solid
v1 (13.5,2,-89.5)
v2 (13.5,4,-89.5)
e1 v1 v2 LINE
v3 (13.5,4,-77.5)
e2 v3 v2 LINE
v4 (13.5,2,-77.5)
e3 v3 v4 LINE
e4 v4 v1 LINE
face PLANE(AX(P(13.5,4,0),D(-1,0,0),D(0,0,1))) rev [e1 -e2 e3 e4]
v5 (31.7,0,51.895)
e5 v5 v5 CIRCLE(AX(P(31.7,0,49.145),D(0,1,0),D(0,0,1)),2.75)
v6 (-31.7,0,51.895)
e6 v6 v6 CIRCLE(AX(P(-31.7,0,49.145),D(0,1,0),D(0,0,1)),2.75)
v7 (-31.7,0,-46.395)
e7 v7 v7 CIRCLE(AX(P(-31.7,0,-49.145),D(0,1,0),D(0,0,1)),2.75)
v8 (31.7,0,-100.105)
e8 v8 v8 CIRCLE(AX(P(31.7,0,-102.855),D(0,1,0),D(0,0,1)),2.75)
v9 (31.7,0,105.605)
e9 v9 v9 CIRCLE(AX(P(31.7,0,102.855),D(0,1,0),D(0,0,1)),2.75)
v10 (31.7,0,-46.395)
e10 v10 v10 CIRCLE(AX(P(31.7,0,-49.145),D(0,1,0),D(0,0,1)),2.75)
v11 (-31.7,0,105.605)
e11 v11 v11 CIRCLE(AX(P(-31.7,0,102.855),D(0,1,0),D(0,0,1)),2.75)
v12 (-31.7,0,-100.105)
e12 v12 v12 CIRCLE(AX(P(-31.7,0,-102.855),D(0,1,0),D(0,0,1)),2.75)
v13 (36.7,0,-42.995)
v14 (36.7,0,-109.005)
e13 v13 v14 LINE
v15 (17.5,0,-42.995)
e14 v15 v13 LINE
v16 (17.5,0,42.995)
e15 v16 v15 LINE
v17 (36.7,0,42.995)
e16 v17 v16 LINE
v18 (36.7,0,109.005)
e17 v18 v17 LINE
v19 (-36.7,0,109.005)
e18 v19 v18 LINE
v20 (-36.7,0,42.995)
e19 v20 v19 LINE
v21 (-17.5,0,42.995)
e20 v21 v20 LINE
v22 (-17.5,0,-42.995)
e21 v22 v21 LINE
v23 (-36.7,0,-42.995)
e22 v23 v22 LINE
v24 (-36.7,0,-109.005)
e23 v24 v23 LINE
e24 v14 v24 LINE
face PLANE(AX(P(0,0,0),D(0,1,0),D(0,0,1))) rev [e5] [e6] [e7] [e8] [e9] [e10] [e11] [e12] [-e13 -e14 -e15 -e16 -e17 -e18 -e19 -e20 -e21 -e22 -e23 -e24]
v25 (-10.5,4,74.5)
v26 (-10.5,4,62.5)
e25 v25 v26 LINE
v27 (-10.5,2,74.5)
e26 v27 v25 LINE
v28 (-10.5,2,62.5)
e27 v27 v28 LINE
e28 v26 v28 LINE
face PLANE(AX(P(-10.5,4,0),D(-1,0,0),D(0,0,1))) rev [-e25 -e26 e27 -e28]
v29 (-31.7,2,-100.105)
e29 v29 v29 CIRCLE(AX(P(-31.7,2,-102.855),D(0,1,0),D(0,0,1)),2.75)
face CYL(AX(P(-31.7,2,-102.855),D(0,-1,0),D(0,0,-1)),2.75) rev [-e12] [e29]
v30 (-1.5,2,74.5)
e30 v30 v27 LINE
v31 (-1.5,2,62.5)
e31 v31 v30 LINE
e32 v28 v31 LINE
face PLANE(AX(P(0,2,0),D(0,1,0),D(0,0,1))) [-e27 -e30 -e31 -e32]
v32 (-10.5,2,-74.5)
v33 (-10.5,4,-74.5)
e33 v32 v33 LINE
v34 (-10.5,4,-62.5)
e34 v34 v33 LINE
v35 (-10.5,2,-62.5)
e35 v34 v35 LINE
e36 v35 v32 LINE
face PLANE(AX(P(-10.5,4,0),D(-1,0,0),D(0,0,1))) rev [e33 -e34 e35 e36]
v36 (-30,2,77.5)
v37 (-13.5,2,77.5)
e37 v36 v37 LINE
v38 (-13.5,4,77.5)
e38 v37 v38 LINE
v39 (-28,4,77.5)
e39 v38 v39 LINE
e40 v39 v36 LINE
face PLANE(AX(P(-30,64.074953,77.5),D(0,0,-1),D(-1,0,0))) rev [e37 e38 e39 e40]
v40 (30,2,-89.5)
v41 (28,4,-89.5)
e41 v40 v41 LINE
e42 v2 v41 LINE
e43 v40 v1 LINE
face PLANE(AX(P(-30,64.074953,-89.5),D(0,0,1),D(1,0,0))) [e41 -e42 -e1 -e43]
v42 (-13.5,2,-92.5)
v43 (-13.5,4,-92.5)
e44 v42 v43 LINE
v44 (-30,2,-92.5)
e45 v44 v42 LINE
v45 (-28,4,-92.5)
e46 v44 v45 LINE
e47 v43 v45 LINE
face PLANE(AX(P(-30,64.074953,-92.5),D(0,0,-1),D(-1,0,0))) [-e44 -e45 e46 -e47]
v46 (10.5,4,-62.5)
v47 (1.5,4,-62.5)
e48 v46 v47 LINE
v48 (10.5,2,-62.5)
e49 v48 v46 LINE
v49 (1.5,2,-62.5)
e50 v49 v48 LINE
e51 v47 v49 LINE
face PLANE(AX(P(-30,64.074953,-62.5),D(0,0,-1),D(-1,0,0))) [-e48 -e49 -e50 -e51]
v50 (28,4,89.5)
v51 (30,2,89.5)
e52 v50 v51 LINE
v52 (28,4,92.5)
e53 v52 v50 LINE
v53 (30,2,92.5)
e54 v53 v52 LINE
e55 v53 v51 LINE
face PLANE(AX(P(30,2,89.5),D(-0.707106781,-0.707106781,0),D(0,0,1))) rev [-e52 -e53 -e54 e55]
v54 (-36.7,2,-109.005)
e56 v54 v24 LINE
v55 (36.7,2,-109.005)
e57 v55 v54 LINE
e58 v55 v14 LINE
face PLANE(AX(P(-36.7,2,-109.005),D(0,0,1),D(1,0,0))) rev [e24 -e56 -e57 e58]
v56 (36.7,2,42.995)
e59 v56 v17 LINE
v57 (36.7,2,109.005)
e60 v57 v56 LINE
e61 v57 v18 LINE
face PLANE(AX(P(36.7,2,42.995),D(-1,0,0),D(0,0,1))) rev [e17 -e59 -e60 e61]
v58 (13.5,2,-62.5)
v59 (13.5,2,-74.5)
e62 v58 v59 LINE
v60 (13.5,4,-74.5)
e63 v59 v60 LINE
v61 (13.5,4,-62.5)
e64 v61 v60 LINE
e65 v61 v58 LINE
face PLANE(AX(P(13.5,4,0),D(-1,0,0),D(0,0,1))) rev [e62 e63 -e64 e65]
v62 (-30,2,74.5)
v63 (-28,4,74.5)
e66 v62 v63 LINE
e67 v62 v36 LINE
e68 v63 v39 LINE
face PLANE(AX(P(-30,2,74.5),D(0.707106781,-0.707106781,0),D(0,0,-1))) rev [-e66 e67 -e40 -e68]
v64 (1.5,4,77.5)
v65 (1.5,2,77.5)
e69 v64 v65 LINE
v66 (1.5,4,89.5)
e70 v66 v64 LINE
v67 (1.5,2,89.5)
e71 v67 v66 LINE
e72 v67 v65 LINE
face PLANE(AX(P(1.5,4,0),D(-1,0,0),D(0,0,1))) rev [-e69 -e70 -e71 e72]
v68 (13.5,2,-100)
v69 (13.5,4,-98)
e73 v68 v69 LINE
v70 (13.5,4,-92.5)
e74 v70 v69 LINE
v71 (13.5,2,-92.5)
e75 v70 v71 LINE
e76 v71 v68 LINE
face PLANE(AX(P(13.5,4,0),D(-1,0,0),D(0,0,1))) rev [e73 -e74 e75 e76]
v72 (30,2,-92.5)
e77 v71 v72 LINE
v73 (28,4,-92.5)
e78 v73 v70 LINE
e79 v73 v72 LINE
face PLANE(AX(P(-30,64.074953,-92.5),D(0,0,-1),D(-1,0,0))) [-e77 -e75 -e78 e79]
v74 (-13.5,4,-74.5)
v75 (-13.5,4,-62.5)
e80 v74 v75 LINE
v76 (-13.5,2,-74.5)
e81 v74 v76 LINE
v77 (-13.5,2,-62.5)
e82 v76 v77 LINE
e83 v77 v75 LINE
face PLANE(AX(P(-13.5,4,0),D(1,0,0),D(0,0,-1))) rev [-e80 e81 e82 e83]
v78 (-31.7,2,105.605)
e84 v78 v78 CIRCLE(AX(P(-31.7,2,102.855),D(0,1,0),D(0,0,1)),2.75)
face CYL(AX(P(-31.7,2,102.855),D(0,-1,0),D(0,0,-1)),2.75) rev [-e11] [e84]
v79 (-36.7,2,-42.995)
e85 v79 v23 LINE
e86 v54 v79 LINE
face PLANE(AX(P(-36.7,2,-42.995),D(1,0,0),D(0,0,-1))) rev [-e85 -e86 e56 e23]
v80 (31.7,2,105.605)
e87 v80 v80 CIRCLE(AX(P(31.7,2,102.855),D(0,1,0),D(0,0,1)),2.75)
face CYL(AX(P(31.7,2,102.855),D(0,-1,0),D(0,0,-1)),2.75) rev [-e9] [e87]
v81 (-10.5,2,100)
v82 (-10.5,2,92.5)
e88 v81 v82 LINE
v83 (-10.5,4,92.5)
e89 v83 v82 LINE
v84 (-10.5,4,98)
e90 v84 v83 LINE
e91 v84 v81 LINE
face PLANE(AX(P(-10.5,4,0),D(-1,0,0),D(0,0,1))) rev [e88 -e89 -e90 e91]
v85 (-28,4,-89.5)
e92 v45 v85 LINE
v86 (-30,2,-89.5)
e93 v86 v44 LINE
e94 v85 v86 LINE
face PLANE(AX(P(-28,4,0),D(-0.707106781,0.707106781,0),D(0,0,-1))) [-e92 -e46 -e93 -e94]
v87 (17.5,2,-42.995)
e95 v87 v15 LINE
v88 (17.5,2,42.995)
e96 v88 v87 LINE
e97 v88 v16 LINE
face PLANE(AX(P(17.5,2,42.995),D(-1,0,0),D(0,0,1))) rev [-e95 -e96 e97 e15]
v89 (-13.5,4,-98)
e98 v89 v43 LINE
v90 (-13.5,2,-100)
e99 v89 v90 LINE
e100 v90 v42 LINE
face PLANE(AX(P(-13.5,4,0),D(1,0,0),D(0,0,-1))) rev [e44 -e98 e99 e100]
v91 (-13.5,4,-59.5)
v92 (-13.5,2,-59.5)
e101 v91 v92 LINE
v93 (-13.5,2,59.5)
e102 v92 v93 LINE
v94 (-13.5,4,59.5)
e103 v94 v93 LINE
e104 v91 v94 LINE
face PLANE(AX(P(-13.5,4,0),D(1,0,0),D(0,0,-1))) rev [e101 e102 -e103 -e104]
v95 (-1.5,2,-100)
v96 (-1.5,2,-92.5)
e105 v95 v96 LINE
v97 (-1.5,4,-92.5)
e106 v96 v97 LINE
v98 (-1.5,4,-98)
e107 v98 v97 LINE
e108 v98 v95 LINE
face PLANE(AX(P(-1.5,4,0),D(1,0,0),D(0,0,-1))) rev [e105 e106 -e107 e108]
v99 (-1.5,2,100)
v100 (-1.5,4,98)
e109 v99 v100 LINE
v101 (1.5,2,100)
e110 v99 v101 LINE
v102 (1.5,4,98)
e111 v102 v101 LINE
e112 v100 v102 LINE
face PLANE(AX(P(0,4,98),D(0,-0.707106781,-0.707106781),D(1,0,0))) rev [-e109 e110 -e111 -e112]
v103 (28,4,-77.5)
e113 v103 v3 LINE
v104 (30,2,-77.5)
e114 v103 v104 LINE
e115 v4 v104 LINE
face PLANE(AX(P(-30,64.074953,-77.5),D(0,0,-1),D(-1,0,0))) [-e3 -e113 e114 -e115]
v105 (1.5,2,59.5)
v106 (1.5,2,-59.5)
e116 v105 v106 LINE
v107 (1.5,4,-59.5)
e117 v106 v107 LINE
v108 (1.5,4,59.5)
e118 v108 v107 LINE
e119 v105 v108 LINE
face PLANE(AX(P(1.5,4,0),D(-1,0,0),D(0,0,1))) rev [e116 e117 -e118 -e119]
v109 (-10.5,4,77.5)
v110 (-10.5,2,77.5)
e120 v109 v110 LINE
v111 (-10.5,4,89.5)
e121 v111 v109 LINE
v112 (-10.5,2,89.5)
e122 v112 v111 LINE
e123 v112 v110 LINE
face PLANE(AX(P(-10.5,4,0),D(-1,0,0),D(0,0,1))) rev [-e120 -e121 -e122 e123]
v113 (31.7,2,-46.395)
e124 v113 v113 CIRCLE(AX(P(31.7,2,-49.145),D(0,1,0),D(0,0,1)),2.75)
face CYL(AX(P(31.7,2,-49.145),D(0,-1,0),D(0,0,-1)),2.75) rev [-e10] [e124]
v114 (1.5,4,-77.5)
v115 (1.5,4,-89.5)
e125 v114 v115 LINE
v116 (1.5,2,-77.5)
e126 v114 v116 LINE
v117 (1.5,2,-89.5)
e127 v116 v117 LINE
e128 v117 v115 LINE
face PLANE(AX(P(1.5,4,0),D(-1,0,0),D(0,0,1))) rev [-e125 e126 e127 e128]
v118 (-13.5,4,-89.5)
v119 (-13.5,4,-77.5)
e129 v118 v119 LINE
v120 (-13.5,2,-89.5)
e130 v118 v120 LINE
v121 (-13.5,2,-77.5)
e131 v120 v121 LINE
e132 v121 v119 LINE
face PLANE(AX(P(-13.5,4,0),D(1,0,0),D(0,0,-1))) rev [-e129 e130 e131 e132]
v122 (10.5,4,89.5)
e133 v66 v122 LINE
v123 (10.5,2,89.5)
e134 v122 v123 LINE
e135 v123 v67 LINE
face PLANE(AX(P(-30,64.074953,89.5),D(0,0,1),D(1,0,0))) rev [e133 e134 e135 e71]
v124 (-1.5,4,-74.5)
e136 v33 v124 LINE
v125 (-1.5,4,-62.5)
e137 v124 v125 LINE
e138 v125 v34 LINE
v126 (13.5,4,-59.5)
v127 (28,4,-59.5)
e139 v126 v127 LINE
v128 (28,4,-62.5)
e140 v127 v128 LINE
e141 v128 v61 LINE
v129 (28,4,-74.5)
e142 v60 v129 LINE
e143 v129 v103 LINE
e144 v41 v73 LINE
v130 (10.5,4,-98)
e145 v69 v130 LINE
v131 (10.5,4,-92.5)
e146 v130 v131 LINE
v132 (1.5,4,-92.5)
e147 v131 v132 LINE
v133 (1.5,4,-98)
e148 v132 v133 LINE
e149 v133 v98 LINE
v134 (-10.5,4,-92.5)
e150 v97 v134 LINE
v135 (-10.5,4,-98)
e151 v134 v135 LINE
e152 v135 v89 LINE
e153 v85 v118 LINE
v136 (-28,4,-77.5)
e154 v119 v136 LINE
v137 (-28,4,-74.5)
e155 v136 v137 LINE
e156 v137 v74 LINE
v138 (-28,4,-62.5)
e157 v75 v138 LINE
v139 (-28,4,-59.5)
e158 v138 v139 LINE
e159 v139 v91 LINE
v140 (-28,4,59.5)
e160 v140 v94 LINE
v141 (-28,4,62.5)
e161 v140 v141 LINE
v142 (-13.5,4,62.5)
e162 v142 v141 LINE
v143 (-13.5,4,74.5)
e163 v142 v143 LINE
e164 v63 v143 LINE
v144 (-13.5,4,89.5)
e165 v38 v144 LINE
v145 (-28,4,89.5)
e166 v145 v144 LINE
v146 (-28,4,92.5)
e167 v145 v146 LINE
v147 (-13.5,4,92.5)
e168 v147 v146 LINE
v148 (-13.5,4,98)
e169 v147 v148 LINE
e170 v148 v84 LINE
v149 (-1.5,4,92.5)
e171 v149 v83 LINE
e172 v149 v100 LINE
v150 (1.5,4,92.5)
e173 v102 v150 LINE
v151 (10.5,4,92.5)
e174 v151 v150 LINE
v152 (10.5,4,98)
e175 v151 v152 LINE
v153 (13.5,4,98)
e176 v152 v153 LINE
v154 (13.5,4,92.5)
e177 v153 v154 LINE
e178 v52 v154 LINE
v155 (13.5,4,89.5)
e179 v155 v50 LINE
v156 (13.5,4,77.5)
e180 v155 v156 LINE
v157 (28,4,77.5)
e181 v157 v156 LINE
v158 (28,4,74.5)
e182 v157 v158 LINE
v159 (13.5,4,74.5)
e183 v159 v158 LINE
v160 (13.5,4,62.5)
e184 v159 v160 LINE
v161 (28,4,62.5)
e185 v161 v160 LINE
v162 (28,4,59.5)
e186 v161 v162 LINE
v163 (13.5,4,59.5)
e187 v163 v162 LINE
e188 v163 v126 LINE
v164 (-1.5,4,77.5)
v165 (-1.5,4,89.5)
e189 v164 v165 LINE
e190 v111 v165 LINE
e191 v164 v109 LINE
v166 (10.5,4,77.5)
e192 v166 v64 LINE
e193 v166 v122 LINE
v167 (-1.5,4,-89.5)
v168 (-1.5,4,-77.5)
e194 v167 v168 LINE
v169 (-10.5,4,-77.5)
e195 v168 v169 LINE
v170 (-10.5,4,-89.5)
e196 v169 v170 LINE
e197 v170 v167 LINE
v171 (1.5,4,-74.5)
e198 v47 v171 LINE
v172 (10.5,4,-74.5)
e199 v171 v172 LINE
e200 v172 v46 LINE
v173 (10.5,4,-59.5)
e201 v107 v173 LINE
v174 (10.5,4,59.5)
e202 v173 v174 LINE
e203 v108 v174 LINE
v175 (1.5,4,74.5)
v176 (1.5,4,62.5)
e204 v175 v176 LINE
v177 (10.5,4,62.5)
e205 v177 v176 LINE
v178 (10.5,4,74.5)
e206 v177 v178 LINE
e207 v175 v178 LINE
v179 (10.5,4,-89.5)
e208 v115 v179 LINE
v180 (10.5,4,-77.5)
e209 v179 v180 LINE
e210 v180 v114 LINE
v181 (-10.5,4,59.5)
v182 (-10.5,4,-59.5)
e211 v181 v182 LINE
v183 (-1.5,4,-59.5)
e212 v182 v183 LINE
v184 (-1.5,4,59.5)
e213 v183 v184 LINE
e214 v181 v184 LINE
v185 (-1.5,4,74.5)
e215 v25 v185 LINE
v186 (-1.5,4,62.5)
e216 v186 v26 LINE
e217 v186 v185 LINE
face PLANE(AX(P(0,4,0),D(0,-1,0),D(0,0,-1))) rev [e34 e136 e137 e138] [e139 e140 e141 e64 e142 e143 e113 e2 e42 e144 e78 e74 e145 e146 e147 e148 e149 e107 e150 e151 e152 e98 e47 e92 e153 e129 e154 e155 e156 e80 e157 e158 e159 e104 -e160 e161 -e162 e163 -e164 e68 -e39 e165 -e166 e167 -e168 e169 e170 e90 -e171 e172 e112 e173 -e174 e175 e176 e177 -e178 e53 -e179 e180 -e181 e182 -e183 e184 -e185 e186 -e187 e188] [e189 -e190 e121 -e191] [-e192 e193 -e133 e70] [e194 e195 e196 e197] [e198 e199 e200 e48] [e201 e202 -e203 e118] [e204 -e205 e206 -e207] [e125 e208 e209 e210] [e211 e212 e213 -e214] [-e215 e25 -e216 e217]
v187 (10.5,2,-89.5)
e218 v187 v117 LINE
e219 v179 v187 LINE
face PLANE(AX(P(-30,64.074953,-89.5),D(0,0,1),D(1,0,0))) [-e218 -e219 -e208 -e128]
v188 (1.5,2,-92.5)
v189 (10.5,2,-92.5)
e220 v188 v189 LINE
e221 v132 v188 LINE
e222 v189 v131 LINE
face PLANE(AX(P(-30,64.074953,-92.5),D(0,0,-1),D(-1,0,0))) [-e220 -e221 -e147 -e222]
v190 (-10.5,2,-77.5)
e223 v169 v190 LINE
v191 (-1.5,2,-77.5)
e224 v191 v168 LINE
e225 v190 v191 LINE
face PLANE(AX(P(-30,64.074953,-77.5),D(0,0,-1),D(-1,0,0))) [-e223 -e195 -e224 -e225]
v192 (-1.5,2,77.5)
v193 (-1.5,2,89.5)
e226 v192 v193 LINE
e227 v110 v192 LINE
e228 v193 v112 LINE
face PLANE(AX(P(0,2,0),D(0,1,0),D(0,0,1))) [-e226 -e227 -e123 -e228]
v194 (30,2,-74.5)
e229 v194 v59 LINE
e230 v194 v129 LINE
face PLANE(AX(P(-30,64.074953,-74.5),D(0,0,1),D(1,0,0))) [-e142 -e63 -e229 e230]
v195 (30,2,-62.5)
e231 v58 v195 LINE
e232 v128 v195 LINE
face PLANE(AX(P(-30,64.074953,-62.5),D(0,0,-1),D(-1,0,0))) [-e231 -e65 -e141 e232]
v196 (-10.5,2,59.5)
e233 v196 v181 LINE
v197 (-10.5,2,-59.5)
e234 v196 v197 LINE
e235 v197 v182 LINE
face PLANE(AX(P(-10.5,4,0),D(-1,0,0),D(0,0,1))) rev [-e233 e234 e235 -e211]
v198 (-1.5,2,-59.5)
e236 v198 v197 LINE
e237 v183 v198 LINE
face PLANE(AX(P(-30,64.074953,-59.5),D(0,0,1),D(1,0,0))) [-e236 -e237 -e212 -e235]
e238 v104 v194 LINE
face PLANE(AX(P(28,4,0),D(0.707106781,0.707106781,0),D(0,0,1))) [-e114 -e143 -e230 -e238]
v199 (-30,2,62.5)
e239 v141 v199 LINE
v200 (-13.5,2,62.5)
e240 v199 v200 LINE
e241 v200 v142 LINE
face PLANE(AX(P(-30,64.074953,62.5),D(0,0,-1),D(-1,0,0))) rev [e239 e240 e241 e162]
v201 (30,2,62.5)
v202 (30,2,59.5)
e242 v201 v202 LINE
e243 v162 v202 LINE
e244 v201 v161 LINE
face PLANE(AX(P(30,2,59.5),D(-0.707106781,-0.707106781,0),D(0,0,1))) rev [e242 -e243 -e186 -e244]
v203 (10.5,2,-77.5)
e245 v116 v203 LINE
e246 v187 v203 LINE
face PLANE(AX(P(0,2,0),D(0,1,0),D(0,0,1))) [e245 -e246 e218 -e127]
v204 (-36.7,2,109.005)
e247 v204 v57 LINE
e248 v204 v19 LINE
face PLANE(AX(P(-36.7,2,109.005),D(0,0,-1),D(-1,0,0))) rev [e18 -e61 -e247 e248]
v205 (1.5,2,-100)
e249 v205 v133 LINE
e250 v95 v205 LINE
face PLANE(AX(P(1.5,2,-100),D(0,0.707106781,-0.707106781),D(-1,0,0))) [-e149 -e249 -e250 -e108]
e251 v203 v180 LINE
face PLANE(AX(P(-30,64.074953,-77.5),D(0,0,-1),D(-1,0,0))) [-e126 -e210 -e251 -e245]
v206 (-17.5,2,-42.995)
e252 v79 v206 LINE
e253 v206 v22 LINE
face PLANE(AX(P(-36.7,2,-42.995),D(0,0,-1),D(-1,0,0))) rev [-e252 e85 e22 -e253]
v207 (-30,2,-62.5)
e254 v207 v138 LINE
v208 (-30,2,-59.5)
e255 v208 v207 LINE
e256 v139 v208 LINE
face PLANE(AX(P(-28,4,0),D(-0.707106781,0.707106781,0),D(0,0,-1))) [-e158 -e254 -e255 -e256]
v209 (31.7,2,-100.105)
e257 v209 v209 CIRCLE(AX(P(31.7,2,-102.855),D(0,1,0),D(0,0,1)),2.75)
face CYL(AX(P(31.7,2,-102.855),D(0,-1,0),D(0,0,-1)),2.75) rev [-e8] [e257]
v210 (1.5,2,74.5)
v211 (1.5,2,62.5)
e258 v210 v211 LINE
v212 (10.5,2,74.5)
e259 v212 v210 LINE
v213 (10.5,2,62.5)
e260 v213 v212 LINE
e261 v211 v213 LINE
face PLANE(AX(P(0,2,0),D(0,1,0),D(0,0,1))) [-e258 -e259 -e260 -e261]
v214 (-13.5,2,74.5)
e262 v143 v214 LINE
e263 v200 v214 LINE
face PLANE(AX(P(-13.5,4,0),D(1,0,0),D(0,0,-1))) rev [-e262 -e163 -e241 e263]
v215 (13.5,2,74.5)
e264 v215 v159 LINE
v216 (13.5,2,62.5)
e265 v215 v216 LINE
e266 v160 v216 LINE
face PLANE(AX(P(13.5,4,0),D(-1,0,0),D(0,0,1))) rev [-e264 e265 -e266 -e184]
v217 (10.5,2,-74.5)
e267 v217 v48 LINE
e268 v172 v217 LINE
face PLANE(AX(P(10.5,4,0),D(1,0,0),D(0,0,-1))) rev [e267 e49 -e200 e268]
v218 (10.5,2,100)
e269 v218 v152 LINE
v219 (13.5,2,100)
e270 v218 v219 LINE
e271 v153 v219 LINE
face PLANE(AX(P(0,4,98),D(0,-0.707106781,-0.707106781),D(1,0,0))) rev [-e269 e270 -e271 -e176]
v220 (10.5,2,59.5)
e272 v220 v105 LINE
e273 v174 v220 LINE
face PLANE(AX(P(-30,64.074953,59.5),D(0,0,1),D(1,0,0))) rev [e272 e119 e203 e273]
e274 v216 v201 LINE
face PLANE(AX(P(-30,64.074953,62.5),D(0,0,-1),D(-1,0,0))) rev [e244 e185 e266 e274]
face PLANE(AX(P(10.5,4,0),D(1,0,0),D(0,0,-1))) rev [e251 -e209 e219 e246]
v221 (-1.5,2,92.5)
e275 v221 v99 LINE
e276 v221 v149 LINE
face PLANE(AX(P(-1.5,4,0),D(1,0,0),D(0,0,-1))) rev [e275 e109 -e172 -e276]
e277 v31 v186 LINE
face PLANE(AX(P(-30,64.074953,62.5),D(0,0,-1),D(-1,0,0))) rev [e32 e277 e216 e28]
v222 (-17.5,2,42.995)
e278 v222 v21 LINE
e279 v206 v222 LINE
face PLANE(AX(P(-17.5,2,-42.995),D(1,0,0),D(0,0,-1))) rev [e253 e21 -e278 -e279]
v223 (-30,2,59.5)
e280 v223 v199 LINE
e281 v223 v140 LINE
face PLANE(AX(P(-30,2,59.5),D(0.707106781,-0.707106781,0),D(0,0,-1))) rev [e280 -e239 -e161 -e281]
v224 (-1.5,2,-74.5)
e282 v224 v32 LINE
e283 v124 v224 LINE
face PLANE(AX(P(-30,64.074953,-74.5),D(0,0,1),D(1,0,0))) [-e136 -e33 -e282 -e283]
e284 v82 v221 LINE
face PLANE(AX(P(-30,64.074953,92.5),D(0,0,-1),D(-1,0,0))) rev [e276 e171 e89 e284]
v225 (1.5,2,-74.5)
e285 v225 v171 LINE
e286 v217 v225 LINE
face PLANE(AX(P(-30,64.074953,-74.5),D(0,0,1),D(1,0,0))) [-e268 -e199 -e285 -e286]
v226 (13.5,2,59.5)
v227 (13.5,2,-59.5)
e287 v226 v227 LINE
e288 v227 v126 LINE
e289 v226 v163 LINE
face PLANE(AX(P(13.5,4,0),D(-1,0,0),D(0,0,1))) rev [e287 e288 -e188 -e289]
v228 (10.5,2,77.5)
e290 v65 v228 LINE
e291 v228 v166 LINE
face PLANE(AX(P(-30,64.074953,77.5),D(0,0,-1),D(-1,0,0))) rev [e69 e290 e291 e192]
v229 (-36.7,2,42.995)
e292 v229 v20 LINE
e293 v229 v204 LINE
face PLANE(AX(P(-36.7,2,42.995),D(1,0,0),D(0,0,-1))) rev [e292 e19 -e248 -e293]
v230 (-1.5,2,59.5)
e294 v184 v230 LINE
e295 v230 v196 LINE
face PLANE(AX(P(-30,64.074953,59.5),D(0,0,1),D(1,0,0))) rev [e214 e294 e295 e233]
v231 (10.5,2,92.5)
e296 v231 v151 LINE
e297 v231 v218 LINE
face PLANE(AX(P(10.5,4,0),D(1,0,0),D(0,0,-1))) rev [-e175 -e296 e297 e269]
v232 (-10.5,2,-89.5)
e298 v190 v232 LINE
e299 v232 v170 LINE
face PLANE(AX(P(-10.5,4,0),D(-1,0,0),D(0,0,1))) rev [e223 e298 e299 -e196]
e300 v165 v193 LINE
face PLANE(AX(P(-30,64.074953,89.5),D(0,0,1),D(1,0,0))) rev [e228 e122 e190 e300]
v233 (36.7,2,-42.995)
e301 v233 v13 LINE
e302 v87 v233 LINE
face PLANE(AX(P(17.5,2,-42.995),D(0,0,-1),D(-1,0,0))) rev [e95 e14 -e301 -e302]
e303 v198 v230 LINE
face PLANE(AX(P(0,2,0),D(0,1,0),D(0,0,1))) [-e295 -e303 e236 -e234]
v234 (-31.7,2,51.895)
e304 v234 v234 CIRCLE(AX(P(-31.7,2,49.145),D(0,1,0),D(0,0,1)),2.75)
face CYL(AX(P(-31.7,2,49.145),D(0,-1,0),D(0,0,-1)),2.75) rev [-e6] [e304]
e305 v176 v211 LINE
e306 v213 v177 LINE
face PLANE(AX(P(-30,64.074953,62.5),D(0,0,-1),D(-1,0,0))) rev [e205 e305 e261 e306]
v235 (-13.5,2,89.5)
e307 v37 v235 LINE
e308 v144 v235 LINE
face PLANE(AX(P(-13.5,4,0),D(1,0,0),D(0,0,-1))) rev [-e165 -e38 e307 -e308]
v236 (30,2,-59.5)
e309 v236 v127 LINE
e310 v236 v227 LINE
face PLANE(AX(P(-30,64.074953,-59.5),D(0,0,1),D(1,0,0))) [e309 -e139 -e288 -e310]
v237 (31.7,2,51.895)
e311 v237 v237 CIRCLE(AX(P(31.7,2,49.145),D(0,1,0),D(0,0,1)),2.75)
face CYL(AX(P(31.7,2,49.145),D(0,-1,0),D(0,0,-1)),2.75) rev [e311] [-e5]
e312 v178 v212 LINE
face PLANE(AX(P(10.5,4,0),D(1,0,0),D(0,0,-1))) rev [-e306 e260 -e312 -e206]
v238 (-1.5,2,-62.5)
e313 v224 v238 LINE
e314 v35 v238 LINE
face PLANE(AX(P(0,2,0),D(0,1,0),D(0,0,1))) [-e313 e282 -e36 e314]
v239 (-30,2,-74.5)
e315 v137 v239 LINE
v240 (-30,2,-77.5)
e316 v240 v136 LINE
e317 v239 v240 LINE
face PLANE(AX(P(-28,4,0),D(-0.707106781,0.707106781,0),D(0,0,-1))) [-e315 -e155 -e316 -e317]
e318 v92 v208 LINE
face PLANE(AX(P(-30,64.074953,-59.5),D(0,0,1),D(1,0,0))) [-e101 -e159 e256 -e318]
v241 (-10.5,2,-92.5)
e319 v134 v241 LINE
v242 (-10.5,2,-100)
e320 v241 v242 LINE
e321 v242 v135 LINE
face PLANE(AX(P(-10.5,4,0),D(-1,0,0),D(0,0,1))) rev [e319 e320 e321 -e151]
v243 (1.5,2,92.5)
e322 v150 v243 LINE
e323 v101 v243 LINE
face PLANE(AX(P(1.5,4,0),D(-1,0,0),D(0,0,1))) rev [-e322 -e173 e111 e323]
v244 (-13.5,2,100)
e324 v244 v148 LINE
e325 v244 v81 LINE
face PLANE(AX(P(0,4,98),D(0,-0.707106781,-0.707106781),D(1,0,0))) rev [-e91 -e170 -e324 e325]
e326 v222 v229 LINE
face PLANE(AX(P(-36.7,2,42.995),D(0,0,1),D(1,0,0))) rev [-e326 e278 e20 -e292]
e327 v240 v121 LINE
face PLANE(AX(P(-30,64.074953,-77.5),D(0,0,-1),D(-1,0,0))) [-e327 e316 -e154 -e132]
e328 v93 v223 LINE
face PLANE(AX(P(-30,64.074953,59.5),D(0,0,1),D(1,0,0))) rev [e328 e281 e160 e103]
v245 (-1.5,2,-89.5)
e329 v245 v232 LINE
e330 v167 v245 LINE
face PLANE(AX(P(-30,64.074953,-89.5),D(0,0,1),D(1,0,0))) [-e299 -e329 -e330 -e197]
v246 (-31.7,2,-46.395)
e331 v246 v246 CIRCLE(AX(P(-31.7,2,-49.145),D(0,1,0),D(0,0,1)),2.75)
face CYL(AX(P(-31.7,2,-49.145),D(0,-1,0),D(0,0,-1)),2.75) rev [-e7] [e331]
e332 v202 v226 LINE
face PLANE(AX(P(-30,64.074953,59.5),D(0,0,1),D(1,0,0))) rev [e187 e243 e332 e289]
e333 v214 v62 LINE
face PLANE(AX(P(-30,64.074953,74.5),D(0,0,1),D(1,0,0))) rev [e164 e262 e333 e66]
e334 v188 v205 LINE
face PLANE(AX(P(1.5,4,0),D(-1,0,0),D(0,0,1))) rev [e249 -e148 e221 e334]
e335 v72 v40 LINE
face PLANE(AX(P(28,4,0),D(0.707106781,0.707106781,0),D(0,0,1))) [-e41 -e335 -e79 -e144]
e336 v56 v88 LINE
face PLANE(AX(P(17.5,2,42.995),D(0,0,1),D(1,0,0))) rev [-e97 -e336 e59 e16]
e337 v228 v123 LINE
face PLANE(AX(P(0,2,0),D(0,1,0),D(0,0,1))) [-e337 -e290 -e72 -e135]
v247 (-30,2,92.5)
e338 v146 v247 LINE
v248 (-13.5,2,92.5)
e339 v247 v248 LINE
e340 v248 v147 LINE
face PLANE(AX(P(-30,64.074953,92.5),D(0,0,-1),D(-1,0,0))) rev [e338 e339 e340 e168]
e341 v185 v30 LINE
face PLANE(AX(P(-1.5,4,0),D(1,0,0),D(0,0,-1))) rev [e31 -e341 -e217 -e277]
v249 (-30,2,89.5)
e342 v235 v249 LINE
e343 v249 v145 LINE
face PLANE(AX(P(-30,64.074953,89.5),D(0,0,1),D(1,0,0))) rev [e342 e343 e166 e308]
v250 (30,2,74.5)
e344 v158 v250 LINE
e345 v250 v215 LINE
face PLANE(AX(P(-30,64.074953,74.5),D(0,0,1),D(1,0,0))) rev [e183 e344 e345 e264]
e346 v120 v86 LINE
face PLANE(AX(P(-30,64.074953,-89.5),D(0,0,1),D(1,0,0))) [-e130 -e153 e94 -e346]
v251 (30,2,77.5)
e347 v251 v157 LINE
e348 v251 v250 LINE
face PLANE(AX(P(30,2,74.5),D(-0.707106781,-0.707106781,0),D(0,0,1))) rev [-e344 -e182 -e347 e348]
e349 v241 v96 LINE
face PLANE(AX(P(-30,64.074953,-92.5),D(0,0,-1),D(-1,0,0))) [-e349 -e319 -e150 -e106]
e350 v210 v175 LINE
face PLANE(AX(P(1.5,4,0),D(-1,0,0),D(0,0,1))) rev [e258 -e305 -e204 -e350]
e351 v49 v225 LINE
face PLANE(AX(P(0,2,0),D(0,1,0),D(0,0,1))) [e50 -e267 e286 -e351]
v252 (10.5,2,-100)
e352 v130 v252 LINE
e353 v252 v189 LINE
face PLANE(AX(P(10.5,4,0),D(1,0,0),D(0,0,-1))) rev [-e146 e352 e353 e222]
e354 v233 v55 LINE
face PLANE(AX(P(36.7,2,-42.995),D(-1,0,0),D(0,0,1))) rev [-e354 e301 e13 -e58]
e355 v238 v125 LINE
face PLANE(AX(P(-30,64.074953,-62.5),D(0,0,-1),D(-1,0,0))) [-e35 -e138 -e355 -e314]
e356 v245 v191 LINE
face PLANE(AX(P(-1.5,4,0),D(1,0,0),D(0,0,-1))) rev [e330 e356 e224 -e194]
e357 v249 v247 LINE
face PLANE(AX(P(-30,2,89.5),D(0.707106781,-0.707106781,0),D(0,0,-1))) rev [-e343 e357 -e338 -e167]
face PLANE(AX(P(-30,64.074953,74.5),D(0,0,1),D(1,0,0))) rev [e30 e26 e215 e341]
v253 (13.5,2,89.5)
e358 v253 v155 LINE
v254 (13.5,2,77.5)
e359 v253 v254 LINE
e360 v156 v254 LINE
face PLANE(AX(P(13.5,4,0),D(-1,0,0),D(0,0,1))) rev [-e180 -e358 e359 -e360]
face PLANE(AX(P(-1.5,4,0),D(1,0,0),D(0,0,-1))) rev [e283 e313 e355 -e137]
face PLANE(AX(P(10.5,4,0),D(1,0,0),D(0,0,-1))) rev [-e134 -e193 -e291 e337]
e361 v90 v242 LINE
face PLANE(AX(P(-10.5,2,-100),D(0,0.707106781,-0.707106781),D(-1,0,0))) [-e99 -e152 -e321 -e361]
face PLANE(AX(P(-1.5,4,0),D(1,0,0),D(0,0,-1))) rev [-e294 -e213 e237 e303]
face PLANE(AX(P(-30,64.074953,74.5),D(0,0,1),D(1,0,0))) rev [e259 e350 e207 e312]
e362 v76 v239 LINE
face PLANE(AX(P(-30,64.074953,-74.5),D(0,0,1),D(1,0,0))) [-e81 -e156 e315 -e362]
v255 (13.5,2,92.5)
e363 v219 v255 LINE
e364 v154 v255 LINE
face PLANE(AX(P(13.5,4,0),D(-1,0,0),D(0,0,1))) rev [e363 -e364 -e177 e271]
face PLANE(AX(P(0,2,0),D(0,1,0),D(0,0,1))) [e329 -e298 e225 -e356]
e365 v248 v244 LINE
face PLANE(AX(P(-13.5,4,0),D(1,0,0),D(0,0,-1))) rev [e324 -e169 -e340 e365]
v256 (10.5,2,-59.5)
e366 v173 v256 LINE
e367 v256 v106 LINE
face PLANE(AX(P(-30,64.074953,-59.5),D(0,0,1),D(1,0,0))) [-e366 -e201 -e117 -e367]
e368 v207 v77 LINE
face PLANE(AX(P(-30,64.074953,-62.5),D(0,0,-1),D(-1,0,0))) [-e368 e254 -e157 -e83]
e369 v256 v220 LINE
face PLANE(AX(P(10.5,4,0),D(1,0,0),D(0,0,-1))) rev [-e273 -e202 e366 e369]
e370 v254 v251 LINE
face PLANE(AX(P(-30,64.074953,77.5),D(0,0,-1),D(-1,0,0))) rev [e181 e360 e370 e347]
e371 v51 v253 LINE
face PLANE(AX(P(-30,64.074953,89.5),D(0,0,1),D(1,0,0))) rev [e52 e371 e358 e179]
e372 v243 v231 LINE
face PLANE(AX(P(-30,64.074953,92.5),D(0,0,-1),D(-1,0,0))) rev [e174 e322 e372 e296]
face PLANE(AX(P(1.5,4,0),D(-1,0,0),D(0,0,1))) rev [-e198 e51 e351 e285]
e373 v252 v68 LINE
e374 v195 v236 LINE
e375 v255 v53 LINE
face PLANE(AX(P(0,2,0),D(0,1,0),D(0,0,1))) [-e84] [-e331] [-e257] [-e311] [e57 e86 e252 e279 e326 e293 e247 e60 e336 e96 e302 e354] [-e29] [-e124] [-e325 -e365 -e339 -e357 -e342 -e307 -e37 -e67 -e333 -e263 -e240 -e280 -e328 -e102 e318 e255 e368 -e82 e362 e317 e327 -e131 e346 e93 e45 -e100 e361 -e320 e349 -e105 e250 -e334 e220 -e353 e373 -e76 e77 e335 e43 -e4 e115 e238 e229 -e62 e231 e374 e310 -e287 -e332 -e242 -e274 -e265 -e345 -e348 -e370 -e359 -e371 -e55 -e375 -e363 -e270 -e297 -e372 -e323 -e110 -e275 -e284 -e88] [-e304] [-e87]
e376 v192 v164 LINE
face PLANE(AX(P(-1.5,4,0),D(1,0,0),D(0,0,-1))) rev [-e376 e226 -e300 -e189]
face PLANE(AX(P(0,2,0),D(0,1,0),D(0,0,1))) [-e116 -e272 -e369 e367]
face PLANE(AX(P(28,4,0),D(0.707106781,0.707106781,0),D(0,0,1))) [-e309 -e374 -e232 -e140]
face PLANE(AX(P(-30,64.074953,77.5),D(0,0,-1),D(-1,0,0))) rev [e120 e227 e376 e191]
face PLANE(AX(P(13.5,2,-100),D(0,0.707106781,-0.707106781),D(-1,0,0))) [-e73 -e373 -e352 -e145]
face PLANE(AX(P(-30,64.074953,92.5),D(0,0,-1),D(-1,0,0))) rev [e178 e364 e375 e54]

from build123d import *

# Parameters (mm, degrees)
SKETCH1_R                = 2.75
BOSS_EXTRUDE1_DEPTH      = 2
SKETCH2_W                = 3
SKETCH2_H                = 100
BOSS_EXTRUDE2_DEPTH      = 2
SKETCH3_W                = 60
SKETCH3_H                = 3
BOSS_EXTRUDE3_DEPTH      = 2
CHAMFER1_SIZE            = 2
CHAMFER1_OF_MIRROR1_SIZE = 2


with BuildPart() as part:
    # Sketch1 → Boss-Extrude1 (new body)
    with BuildSketch(Plane(origin=(0, 0, 0), x_dir=(1, 0, 0), z_dir=(0, 1, 0))):
        Polygon((-17.5, 42.995), (-17.5, -42.995), (-36.7, -42.995), (-36.7, -109.005), (36.7, -109.005), (36.7, -42.995), (17.5, -42.995), (17.5, 42.995), (36.7, 42.995), (36.7, 109.005), (-36.7, 109.005), (-36.7, 42.995), align=None)
        with Locations(Location((-31.7, 102.855, 0), (0, 0, 270))):
            Circle(SKETCH1_R, mode=Mode.SUBTRACT)
        with Locations(Location((-31.7, 49.145, 0), (0, 0, 270))):
            Circle(SKETCH1_R, mode=Mode.SUBTRACT)
        with Locations(Location((31.7, 49.145, 0), (0, 0, 270))):
            Circle(SKETCH1_R, mode=Mode.SUBTRACT)
        with Locations(Location((31.7, 102.855, 0), (0, 0, 270))):
            Circle(SKETCH1_R, mode=Mode.SUBTRACT)
        with Locations(Location((31.7, -102.855, 0), (0, 0, 270))):
            Circle(SKETCH1_R, mode=Mode.SUBTRACT)
        with Locations(Location((31.7, -49.145, 0), (0, 0, 270))):
            Circle(SKETCH1_R, mode=Mode.SUBTRACT)
        with Locations(Location((-31.7, -49.145, 0), (0, 0, 270))):
            Circle(SKETCH1_R, mode=Mode.SUBTRACT)
        with Locations(Location((-31.7, -102.855, 0), (0, 0, 270))):
            Circle(SKETCH1_R, mode=Mode.SUBTRACT)
    extrude(amount=BOSS_EXTRUDE1_DEPTH)

    # Sketch2 → Boss-Extrude2 (add)
    with BuildSketch(Plane(origin=(0, 2, 0), x_dir=(1, 0, 0), z_dir=(0, 1, 0))):
        with Locations((12, -50)):
            Rectangle(SKETCH2_W, SKETCH2_H)
        with Locations((0, -50)):
            Rectangle(SKETCH2_W, SKETCH2_H)
        with Locations((-12, -50)):
            Rectangle(SKETCH2_W, SKETCH2_H)
    boss_extrude2 = extrude(amount=BOSS_EXTRUDE2_DEPTH)

    # Sketch3 → Boss-Extrude3 (add)
    with BuildSketch(Plane(origin=(0, 2, 0), x_dir=(1, 0, 0), z_dir=(0, 1, 0))):
        with Locations((0, -91)):
            Rectangle(SKETCH3_W, SKETCH3_H)
        with Locations((0, -61)):
            Rectangle(SKETCH3_W, SKETCH3_H)
        with Locations((0, -76)):
            Rectangle(SKETCH3_W, SKETCH3_H)
    boss_extrude3 = extrude(amount=BOSS_EXTRUDE3_DEPTH)

    # Chamfer1
    chamfer1_edges = [part.edges().sort_by_distance(p)[0] for p in [
        (30, 4, 61),
        (30, 4, 76),
        (30, 4, 91),
        (12, 4, 100),
        (0, 4, 100),
        (-12, 4, 100),
        (-30, 4, 91),
        (-30, 4, 76),
        (-30, 4, 61),
    ]]
    chamfer(chamfer1_edges, length=CHAMFER1_SIZE - 0.0001)  # a hair under: the kernel refuses the full size

    # Mirror1: Boss-Extrude2, Boss-Extrude3 across plane
    add(boss_extrude2.mirror(Plane.XY))
    add(boss_extrude3.mirror(Plane.XY))

    # Chamfer1 of Mirror1
    chamfer1_of_mirror1_edges = [part.edges().sort_by_distance(p)[0] for p in [
        (30, 4, -61),
        (30, 4, -76),
        (30, 4, -91),
        (12, 4, -100),
        (0, 4, -100),
        (-12, 4, -100),
        (-30, 4, -91),
        (-30, 4, -76),
        (-30, 4, -61),
    ]]
    chamfer(chamfer1_of_mirror1_edges, length=CHAMFER1_OF_MIRROR1_SIZE - 0.0001)  # a hair under: the kernel refuses the full size


solid = part.part
